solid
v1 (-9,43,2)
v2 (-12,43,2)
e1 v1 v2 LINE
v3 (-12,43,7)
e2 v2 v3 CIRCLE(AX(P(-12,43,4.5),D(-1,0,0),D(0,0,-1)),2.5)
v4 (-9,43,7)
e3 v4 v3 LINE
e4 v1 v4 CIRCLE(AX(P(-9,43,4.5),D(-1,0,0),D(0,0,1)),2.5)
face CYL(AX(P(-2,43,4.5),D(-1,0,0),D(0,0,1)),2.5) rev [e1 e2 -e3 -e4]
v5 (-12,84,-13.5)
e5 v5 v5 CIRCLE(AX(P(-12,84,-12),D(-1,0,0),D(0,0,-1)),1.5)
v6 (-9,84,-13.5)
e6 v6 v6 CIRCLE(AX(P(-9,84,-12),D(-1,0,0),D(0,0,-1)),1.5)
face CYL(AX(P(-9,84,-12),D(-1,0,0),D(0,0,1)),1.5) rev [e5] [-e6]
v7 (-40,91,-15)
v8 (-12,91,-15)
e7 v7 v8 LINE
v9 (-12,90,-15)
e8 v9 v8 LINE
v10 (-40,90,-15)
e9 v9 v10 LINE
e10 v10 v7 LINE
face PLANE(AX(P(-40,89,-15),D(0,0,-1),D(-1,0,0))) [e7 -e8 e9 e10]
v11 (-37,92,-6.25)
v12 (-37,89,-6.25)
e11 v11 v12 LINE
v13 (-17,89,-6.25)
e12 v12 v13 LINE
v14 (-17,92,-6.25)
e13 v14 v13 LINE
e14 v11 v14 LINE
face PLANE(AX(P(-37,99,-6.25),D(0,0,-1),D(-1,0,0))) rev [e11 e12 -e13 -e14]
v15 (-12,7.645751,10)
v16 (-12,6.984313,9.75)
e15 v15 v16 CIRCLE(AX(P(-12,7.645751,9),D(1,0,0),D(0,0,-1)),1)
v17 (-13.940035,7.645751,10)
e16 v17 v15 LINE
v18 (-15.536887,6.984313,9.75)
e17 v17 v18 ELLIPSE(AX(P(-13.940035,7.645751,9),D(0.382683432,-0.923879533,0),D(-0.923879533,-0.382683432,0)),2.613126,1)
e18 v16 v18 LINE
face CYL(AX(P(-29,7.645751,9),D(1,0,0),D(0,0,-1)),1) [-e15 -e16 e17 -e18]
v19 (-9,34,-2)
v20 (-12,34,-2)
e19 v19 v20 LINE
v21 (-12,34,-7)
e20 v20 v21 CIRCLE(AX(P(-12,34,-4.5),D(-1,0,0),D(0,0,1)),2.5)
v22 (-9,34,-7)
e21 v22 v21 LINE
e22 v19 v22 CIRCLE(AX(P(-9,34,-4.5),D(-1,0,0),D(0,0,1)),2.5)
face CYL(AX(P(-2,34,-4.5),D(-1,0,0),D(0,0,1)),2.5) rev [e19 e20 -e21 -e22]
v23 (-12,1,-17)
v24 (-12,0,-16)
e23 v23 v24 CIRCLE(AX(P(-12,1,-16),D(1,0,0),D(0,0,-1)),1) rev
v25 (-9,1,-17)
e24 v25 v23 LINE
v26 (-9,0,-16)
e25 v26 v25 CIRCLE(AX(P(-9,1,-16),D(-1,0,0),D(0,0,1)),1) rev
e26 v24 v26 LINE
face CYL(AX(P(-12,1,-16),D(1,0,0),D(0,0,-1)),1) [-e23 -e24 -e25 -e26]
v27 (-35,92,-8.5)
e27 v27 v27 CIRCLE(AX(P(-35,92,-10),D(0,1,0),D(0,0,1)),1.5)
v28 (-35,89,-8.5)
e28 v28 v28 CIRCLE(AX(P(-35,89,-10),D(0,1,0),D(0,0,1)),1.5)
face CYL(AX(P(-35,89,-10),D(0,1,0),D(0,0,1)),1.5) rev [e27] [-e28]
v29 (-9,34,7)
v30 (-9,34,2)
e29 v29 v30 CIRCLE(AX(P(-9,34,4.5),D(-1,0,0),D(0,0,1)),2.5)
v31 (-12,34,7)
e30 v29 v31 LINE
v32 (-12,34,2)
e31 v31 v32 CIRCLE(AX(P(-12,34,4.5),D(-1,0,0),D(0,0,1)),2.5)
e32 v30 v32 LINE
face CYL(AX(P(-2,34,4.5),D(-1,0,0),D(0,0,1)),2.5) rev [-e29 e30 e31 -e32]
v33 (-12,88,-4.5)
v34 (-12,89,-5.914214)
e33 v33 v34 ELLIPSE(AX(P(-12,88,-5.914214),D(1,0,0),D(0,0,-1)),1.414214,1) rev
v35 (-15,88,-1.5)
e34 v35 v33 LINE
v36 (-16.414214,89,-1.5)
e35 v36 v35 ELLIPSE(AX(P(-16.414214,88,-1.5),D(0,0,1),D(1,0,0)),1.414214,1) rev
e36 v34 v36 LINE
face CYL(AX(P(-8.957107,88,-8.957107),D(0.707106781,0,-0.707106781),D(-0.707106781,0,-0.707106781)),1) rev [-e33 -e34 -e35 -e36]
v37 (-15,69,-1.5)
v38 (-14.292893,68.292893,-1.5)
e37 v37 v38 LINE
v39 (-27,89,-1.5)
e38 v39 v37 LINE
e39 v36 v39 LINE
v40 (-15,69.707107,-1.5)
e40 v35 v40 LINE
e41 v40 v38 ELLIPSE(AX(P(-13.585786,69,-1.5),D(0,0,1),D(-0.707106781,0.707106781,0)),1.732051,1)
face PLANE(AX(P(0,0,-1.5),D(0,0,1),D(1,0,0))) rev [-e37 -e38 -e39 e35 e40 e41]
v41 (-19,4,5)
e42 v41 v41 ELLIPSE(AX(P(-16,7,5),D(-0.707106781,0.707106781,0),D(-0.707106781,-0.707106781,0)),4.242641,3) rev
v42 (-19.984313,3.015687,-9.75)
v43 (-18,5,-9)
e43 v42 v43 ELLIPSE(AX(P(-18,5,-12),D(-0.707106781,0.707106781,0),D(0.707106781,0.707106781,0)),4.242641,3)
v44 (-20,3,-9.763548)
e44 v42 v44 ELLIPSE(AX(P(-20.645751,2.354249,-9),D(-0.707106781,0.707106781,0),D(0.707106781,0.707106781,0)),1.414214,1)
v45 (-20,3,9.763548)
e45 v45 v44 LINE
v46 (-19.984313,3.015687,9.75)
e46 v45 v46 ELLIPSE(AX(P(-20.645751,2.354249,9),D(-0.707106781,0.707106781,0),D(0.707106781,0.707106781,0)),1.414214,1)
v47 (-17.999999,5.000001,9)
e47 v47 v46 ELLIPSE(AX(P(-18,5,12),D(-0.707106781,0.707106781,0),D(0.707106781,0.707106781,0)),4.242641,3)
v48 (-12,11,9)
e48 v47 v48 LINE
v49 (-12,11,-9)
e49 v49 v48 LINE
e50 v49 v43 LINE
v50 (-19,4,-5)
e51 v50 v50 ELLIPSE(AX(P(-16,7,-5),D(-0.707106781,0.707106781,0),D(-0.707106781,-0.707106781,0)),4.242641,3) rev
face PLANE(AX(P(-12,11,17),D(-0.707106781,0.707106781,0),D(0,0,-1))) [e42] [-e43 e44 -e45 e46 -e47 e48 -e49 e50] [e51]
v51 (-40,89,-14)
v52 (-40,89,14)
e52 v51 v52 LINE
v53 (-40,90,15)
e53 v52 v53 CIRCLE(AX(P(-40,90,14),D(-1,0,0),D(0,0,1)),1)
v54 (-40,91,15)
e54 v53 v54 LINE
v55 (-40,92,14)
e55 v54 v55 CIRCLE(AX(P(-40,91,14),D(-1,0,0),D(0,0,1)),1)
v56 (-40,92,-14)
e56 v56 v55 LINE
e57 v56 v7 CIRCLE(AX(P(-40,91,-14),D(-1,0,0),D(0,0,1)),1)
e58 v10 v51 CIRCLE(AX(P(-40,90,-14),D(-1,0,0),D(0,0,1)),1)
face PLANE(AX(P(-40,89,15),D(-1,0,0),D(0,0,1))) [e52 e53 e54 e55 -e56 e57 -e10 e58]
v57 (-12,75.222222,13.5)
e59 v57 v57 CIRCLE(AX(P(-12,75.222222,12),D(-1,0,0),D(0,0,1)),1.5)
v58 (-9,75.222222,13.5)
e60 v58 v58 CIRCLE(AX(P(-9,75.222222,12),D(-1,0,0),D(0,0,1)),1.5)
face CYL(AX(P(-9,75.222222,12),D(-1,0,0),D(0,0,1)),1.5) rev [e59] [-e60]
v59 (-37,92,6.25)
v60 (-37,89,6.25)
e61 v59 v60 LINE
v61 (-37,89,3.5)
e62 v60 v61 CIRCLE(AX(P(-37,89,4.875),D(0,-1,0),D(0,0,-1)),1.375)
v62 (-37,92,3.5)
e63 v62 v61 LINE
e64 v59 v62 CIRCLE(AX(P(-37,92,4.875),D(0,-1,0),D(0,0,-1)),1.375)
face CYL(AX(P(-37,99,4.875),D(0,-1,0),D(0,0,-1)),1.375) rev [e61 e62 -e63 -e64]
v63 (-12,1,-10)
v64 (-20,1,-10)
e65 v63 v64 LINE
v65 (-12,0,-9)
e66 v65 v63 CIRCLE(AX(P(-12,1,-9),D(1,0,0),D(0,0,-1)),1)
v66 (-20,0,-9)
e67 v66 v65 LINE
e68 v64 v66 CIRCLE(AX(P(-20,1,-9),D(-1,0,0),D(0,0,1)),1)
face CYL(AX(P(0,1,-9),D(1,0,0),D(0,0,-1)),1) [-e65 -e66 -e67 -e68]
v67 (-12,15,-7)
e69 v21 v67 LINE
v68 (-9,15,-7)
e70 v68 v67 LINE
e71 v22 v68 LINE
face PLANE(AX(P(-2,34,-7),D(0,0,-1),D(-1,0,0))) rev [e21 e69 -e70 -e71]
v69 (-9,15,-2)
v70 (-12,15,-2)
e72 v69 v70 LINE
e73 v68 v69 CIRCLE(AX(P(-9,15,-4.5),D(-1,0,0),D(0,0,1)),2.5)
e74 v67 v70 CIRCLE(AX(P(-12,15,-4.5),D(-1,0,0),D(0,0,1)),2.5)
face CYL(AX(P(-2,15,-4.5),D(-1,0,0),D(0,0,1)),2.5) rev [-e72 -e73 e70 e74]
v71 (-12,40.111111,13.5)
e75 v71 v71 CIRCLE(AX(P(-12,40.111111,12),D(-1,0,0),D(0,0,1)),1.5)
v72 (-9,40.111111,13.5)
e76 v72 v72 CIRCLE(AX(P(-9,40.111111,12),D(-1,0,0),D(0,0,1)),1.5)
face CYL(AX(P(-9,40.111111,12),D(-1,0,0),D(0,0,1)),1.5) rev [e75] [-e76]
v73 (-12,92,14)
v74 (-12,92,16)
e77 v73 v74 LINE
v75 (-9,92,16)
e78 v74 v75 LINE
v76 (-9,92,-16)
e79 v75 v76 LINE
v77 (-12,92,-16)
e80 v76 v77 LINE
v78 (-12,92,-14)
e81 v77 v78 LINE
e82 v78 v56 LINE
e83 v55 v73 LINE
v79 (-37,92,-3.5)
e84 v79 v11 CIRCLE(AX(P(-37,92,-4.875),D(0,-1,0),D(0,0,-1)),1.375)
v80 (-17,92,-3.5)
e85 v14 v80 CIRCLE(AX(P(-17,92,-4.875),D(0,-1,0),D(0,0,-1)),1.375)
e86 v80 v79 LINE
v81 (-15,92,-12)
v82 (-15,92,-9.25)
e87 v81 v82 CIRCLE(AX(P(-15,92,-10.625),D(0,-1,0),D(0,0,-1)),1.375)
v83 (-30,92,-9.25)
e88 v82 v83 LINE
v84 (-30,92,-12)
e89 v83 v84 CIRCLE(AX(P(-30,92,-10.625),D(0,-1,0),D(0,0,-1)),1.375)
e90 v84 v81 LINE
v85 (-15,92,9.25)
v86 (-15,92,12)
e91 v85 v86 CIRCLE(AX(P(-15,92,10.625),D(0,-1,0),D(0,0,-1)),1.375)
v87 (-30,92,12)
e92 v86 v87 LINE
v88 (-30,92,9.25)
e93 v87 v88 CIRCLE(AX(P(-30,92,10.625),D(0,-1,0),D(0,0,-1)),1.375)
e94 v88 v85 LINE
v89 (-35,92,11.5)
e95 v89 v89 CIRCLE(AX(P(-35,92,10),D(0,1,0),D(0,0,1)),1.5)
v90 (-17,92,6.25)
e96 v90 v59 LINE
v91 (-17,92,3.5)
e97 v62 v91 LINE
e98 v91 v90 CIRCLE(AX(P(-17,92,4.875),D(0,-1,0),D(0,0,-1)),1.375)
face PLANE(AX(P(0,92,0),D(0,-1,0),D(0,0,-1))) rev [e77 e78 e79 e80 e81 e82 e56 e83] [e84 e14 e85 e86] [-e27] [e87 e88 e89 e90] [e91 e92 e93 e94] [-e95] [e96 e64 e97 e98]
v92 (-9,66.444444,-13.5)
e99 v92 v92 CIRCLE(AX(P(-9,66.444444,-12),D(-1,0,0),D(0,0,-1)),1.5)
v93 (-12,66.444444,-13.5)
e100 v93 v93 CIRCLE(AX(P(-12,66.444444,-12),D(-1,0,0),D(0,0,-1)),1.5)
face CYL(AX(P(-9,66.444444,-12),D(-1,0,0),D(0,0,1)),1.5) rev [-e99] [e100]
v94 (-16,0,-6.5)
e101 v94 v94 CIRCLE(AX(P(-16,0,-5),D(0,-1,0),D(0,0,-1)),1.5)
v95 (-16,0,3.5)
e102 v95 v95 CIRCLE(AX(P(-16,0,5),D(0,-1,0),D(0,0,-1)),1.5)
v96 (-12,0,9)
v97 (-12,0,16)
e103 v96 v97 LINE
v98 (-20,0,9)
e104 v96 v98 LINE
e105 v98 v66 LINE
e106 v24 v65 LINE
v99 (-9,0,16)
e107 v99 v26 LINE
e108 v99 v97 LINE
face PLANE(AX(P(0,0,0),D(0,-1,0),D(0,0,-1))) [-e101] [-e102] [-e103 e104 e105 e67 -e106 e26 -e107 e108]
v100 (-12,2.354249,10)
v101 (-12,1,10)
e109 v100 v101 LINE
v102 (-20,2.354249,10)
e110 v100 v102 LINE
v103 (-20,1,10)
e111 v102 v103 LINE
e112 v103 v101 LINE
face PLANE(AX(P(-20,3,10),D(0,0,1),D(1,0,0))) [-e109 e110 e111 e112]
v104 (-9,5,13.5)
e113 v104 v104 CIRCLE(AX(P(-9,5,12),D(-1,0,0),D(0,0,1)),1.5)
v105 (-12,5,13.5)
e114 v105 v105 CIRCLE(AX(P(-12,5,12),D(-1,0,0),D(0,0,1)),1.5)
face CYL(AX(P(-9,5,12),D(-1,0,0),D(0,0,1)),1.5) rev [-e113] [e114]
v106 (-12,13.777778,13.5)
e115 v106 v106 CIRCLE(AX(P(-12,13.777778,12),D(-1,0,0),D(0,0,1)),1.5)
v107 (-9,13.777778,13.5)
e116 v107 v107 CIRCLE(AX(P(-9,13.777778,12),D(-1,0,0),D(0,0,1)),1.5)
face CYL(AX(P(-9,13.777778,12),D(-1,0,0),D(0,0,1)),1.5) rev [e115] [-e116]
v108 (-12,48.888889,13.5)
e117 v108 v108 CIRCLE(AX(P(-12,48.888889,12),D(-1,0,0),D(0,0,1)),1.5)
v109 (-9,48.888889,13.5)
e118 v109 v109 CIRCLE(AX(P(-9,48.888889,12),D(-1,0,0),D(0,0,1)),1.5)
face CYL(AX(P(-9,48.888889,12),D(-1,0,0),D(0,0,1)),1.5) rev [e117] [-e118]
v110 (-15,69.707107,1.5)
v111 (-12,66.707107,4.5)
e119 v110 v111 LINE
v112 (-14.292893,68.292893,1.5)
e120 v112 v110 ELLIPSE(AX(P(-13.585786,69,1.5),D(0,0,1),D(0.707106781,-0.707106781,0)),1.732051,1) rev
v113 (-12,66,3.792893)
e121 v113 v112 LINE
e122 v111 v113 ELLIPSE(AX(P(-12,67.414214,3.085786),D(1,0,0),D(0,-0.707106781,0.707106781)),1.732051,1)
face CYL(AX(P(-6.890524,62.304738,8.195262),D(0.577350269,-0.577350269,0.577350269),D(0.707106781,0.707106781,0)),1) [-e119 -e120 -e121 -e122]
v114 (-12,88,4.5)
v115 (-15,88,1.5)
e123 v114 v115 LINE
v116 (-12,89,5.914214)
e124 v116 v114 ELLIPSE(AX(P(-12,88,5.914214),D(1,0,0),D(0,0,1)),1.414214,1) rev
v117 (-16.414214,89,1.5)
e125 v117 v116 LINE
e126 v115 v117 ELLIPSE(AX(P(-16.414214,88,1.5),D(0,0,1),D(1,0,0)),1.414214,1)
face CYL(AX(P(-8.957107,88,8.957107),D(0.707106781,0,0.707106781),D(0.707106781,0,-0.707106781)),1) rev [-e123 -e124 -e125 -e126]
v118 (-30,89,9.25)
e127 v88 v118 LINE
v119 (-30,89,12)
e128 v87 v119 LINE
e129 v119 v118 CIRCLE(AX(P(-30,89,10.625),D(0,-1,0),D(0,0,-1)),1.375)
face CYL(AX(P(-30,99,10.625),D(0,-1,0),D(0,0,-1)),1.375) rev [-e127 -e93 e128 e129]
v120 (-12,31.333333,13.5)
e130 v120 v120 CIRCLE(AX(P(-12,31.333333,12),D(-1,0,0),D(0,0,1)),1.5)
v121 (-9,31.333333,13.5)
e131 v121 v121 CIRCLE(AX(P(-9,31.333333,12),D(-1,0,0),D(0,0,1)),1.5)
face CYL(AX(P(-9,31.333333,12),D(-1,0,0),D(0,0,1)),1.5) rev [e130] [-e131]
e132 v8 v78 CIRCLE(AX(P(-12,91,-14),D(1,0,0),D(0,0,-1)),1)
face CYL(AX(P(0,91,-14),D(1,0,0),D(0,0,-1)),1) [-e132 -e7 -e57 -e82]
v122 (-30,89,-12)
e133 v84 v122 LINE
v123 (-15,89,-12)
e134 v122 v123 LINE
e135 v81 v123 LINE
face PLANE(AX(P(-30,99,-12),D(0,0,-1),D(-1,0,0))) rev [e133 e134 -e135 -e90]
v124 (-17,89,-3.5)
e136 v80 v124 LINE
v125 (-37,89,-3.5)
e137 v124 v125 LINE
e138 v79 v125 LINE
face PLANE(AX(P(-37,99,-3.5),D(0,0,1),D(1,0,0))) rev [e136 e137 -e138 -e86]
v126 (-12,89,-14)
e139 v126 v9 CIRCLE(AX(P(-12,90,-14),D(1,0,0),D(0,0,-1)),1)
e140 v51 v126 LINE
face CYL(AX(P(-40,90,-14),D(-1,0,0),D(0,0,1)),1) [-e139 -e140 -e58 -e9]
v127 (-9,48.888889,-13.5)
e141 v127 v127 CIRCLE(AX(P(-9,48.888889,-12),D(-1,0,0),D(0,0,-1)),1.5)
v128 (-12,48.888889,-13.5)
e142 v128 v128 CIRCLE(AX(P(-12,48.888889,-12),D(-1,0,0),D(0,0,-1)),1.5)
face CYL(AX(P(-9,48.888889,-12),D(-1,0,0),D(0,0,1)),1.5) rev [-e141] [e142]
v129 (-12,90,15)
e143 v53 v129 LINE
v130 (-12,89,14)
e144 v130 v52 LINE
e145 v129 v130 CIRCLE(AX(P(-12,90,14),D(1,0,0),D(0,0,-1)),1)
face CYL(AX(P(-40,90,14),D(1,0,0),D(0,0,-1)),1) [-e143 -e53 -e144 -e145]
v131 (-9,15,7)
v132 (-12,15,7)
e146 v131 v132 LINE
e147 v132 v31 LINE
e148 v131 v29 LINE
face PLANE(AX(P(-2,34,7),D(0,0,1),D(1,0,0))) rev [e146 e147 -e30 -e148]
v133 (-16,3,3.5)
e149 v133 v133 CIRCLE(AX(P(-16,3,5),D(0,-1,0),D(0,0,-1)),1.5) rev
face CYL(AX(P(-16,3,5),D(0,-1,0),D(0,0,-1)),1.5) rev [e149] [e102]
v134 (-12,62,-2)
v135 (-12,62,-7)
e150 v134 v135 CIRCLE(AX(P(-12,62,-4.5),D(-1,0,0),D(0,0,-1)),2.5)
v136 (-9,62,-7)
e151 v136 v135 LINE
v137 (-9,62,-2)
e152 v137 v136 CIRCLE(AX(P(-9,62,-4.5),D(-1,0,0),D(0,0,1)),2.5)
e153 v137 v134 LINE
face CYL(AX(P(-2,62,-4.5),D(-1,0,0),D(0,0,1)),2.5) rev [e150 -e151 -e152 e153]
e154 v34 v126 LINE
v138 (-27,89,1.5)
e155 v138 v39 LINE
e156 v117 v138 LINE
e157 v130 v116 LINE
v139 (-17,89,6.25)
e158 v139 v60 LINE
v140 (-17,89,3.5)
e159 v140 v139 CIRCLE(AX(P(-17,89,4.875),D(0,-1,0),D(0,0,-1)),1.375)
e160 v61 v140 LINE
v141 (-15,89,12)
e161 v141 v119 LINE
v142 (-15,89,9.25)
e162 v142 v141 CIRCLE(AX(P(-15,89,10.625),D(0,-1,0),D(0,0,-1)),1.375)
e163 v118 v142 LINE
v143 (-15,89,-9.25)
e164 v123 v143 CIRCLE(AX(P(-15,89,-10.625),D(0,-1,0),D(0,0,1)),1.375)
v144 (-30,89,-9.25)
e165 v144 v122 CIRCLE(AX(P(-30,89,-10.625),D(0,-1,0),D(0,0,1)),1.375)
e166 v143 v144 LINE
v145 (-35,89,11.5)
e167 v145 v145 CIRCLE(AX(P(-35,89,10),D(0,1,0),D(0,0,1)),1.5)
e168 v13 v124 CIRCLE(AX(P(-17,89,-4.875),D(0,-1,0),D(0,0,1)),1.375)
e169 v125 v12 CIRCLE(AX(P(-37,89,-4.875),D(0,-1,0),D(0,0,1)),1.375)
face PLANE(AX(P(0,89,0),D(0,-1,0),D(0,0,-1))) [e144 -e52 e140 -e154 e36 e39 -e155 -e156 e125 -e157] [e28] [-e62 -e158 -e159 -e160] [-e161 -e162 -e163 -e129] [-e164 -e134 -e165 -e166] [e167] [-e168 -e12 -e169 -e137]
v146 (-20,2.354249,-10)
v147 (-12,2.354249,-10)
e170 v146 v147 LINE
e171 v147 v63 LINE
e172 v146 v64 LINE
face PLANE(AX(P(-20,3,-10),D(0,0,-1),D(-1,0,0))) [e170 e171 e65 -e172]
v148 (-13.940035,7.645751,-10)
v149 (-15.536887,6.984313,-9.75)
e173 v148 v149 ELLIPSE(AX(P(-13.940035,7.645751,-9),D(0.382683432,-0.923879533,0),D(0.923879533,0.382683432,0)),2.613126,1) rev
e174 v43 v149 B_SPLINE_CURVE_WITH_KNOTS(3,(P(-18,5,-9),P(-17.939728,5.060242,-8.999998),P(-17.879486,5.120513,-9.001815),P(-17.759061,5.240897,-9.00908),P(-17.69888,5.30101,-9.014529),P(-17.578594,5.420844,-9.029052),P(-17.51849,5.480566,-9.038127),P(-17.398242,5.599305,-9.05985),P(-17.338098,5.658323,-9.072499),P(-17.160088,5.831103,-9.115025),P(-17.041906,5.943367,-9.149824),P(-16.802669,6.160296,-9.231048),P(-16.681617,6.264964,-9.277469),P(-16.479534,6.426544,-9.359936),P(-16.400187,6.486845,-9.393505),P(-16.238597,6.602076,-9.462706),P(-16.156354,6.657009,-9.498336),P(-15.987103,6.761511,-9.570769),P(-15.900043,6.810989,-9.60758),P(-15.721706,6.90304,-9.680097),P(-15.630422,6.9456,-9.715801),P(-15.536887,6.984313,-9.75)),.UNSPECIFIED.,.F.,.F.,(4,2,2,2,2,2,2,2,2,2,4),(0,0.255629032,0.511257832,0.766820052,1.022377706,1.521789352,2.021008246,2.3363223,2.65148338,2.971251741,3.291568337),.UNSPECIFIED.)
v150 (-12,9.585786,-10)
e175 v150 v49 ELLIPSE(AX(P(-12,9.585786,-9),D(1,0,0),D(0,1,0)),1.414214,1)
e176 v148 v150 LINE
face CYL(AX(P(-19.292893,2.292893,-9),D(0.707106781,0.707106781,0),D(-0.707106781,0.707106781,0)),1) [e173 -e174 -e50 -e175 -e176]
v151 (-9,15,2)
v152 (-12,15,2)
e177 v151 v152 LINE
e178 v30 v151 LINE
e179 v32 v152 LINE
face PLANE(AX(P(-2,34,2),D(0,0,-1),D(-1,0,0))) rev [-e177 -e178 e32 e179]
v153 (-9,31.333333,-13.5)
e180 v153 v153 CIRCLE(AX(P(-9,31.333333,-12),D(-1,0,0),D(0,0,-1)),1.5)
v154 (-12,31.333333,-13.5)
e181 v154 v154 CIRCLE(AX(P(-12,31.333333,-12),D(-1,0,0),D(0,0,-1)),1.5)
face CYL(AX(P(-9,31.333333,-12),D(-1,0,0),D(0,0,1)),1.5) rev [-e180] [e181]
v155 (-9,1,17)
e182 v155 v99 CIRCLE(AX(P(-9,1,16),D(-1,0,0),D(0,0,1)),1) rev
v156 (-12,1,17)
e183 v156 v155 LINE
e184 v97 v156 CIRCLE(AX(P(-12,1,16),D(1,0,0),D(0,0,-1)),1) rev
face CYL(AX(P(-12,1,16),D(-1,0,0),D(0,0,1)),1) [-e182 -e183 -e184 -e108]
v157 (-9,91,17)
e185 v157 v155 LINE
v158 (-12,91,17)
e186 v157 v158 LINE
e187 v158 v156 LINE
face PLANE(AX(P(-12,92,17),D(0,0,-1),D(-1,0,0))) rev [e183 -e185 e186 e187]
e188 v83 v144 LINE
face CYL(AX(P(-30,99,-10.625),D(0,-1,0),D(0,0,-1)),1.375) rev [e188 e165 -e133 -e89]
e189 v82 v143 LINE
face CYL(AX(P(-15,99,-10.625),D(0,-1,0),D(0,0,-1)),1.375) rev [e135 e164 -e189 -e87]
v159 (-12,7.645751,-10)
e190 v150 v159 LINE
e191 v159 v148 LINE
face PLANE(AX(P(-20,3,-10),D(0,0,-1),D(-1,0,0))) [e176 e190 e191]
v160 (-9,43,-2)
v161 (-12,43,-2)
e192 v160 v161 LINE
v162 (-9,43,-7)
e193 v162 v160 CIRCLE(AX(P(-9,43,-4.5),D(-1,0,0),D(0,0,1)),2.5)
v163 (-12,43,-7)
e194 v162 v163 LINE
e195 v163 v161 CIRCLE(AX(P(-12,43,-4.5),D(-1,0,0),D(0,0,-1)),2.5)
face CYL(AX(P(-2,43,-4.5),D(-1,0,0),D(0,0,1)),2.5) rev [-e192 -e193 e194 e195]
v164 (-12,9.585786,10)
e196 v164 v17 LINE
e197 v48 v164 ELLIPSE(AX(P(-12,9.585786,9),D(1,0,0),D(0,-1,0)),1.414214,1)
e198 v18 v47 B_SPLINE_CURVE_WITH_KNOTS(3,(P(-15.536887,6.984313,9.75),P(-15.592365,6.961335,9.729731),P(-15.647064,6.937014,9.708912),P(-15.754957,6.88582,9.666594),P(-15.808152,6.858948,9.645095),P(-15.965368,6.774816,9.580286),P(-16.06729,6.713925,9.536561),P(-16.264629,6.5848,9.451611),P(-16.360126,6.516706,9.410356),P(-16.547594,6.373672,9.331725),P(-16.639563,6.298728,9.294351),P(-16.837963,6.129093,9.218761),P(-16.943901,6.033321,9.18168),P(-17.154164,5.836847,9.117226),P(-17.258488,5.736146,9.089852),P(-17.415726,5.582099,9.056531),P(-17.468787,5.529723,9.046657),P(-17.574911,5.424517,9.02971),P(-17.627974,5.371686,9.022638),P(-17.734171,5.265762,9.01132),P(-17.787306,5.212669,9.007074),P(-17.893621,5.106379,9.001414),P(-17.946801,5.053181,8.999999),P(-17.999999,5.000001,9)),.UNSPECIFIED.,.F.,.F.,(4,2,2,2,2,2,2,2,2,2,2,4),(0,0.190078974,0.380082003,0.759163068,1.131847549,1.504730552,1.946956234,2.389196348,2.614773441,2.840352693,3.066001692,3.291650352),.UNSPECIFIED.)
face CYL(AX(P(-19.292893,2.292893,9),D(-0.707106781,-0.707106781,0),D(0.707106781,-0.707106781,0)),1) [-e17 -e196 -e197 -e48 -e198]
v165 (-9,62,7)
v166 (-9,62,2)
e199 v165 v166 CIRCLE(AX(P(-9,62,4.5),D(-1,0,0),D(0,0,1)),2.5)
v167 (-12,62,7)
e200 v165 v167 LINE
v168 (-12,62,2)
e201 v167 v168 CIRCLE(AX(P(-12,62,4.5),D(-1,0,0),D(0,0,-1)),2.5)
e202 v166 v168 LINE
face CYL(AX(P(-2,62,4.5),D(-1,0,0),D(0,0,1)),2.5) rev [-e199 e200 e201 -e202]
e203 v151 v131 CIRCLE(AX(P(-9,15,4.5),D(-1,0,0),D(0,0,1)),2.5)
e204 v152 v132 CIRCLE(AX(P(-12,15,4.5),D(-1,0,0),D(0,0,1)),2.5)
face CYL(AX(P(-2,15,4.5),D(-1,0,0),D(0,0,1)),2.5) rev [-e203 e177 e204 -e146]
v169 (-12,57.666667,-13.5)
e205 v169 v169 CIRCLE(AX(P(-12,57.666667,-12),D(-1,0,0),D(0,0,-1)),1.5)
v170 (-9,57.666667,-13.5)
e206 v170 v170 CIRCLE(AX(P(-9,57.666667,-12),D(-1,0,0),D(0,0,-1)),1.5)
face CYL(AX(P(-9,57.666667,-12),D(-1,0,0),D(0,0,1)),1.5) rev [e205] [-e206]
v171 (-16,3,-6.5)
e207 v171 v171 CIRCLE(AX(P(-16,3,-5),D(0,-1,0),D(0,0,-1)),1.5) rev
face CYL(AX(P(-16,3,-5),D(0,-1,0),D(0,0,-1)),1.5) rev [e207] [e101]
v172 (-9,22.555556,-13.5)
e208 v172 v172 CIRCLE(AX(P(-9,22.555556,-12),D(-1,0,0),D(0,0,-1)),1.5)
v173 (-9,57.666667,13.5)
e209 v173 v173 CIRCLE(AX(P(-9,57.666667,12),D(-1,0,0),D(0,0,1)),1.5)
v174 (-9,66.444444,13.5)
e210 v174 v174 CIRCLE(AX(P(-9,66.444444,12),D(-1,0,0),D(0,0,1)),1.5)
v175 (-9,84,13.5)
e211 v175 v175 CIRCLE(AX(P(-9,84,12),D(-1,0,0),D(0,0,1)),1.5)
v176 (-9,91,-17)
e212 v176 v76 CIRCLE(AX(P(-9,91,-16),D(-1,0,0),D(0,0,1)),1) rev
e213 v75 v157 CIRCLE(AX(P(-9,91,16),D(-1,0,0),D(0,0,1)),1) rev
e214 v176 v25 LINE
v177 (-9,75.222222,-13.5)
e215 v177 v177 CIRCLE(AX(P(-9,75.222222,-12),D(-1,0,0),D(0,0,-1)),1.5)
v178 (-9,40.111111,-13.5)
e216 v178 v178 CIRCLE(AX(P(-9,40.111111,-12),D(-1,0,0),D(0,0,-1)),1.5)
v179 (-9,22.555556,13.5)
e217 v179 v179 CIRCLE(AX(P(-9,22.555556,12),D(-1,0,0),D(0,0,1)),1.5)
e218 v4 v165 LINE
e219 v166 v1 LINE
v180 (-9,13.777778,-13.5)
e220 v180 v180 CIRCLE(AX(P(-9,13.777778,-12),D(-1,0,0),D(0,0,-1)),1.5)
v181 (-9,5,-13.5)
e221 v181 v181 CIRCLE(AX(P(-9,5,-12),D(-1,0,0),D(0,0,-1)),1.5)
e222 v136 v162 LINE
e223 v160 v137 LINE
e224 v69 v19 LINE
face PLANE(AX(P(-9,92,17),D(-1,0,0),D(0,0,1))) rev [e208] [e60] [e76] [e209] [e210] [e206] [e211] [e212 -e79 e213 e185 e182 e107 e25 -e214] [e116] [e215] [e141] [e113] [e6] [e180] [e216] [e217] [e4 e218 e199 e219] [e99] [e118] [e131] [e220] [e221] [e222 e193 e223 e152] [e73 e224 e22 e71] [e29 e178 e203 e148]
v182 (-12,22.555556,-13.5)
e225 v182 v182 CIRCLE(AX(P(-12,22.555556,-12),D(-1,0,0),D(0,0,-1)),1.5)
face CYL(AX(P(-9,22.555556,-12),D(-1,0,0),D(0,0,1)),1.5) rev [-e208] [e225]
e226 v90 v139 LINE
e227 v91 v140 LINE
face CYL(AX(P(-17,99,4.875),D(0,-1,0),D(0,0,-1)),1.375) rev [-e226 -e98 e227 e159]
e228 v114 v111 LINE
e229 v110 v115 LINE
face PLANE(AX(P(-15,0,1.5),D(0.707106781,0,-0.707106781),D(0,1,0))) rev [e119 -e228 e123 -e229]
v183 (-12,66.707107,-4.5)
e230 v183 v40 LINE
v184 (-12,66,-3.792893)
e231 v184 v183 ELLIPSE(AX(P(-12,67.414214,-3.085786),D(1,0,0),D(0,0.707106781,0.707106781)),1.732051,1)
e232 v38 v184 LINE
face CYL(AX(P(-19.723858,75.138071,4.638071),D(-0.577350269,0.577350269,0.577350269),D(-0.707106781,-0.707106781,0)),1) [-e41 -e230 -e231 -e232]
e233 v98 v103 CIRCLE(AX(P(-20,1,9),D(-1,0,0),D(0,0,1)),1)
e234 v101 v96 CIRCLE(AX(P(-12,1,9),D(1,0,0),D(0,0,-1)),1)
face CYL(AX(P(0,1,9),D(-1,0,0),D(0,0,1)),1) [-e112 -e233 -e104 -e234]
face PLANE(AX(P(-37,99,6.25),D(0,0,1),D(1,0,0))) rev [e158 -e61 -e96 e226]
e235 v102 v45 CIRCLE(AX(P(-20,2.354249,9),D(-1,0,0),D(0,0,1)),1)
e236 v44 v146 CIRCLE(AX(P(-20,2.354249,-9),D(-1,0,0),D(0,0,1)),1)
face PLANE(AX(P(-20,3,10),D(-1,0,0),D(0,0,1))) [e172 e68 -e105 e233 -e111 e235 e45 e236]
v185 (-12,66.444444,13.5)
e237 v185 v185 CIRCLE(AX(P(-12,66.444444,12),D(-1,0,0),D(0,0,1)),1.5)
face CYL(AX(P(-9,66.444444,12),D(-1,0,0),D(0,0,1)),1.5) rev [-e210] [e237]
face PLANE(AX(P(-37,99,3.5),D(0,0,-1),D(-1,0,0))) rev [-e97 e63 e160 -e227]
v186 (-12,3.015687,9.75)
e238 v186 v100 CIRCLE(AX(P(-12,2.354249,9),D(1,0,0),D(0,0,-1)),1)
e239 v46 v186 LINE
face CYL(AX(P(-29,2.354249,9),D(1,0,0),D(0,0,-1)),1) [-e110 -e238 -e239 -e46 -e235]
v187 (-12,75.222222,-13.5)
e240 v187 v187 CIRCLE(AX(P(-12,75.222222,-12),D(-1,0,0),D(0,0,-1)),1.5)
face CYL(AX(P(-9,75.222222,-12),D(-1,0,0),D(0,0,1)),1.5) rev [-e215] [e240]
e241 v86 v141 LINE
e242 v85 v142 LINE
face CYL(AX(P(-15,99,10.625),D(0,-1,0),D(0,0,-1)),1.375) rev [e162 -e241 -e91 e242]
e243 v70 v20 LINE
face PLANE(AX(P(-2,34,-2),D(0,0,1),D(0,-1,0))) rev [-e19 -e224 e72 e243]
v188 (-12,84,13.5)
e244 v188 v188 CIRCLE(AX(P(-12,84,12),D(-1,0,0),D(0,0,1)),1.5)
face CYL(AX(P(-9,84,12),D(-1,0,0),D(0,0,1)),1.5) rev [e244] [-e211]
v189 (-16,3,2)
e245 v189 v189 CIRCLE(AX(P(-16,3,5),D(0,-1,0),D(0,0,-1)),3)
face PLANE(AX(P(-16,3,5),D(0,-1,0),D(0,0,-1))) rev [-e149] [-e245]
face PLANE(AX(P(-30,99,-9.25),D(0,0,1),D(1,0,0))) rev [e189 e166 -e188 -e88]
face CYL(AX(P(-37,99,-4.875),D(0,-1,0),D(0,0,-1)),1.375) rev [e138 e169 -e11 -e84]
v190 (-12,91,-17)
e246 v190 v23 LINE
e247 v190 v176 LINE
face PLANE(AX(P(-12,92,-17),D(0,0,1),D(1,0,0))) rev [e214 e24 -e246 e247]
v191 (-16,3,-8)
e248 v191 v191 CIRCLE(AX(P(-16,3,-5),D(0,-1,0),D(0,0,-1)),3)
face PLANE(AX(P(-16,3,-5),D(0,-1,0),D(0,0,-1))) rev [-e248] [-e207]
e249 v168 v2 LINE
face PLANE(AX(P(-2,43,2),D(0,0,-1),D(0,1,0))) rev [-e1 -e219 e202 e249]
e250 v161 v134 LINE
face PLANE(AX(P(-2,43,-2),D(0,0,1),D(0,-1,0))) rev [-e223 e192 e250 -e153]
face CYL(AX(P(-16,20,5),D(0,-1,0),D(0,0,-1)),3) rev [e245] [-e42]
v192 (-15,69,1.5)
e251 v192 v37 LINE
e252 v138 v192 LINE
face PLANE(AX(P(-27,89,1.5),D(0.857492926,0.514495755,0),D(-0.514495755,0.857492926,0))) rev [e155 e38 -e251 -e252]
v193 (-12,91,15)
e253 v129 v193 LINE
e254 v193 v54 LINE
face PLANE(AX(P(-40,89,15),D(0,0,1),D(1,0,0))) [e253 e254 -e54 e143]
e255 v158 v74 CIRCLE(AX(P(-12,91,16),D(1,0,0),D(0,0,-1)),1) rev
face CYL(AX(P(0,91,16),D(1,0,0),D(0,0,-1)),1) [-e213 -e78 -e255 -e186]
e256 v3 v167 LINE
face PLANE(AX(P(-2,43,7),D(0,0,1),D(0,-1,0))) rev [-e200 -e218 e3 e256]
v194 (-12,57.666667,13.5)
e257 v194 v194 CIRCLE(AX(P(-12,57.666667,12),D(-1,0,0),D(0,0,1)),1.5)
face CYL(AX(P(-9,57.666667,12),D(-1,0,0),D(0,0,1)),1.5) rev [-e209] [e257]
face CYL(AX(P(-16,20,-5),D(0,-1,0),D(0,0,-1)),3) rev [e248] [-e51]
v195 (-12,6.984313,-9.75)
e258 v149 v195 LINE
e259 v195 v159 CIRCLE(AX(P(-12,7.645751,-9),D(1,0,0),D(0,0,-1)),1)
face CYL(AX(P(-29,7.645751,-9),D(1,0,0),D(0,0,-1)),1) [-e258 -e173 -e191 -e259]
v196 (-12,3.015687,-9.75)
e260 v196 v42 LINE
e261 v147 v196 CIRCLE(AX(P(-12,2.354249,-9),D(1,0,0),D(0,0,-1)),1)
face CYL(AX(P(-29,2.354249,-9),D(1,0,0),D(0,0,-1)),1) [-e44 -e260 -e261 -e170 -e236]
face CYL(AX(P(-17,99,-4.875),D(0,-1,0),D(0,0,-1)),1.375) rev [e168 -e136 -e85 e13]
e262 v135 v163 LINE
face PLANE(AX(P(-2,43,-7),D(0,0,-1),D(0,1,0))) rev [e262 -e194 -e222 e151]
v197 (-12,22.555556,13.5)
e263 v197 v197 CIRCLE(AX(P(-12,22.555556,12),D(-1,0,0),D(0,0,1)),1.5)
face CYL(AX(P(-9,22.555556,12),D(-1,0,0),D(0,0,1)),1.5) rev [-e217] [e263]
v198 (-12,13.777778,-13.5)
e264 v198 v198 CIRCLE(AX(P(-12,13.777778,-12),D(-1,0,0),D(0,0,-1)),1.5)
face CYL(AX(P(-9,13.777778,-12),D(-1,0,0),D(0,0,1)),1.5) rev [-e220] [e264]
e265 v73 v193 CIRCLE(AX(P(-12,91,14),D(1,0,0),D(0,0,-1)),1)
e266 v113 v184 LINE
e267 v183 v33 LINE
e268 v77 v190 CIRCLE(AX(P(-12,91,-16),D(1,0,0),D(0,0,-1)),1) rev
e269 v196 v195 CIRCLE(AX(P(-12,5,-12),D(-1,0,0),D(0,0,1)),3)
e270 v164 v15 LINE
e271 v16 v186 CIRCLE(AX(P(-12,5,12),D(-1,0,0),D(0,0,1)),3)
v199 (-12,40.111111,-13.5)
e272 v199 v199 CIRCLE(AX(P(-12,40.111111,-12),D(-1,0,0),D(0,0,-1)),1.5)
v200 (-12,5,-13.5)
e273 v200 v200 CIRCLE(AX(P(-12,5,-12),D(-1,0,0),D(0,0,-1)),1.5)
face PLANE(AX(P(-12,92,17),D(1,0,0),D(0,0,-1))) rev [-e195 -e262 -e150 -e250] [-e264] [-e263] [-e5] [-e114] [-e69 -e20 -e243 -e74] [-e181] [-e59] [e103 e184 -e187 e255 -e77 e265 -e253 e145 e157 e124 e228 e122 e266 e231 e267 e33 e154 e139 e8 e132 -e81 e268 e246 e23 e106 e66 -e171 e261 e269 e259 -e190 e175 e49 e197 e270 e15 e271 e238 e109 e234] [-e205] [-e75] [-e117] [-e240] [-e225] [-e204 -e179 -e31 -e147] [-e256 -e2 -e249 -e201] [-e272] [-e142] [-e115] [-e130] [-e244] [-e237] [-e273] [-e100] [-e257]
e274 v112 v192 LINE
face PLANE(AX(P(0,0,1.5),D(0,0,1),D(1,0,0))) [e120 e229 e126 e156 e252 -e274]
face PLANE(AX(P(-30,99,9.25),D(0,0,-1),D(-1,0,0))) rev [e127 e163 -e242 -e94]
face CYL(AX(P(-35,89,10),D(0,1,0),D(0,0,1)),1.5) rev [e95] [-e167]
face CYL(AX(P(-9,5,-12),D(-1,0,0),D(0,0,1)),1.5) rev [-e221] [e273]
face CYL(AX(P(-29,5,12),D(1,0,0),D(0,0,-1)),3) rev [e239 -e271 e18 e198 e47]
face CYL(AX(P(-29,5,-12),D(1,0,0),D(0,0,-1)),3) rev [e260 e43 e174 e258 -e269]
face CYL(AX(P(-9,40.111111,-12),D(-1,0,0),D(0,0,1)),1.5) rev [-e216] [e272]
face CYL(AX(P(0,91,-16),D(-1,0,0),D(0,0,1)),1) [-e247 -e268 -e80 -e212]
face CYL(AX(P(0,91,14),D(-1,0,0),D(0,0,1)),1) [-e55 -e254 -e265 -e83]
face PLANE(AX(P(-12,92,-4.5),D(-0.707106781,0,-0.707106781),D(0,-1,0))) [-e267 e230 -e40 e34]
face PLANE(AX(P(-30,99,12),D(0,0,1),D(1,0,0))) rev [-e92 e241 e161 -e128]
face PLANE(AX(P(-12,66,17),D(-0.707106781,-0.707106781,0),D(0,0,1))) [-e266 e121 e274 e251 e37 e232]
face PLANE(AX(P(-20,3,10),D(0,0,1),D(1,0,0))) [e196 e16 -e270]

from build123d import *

# Parameters (mm, degrees)
SKETCH_1_W          = 3
SKETCH_1_H          = 34
EXTRUDE_1_DEPTH     = 92
SKETCH_2_W          = 8
SKETCH_2_H          = 20
SKETCH_2_R          = 1.5
EXTRUDE_2_DEPTH     = 3
SKETCH_10_W         = 28
SKETCH_10_H         = 30
SKETCH_10_R         = 1.5
EXTRUDE_6_DEPTH     = 3
EXTRUDE_7_DEPTH     = 1.5
CHAMFER_3_SIZE      = 3
SKETCH_9_R          = 1.5
CUT_EXTRUDE_2_DEPTH = 3
CHAMFER_4_SIZE      = 8
SKETCH_12_R         = 3
CUT_EXTRUDE_3_DEPTH = 17
CUT_EXTRUDE_START   = -3
SKETCH_13_R         = 3
CUT_EXTRUDE_4_DEPTH = 17
FILLET_1_R          = 1
CUT_EXTRUDE_5_DEPTH = 10
CUT_EXTRUDE_6_DEPTH = 10


# Some blends are built 0.0001 mm under size
with BuildPart() as part:
    # 草图1 → 凸台-拉伸1 (new body)
    with BuildSketch(Plane(origin=(0, 0, 0), x_dir=(1, 0, 0), z_dir=(0, 1, 0))):
        with Locations((-10.5, 0)):
            Rectangle(SKETCH_1_W, SKETCH_1_H)
    extrude(amount=EXTRUDE_1_DEPTH)

    # 草图2 → 凸台-拉伸2 (add)
    with BuildSketch(Plane.XZ):
        with Locations((-16, 0)):
            Rectangle(SKETCH_2_W, SKETCH_2_H)
        with Locations(Location((-16, 5, 0), (0, 0, 270))):
            Circle(SKETCH_2_R, mode=Mode.SUBTRACT)
        with Locations(Location((-16, -5, 0), (0, 0, 270))):
            Circle(SKETCH_2_R, mode=Mode.SUBTRACT)
    extrude(amount=-EXTRUDE_2_DEPTH)

    # 草图10 → 凸台-拉伸6 (add)
    with BuildSketch(Plane(origin=(0, 92, 0), x_dir=(1, 0, 0), z_dir=(0, 1, 0))):
        with Locations((-26, 0)):
            Rectangle(SKETCH_10_W, SKETCH_10_H)
        with Locations(Location((-35, 10, 0), (0, 0, 270))):
            Circle(SKETCH_10_R, mode=Mode.SUBTRACT)
        with Locations(Location((-35, -10, 0), (0, 0, 270))):
            Circle(SKETCH_10_R, mode=Mode.SUBTRACT)
    extrude(amount=-EXTRUDE_6_DEPTH)

    # 草图11 → 凸台-拉伸7 (add, symmetric)
    with BuildSketch(Plane.XY):
        Polygon((-12, 69), (-12, 89), (-27, 89), (-15, 69), align=None)
    extrude(amount=EXTRUDE_7_DEPTH, both=True)

    # 倒角3
    chamfer_3_edges = [part.edges().sort_by_distance(p)[0] for p in [
        (-12, 79, -1.5),
        (-12, 69, 0),
        (-12, 79, 1.5),
    ]]
    chamfer(chamfer_3_edges, length=CHAMFER_3_SIZE - 0.0001)  # a hair under: the kernel refuses the full size

    # 草图9 → 切除-拉伸2 (cut)
    with BuildSketch(Plane.ZY.offset(12)):
        with Locations((12, 5)):
            Circle(SKETCH_9_R)
        with Locations((12, 13.777777778)):
            Circle(SKETCH_9_R)
        with Locations((12, 22.555555556)):
            Circle(SKETCH_9_R)
        with Locations((12, 31.333333333)):
            Circle(SKETCH_9_R)
        with Locations((12, 40.111111111)):
            Circle(SKETCH_9_R)
        with Locations((12, 48.888888889)):
            Circle(SKETCH_9_R)
        with Locations((12, 57.666666667)):
            Circle(SKETCH_9_R)
        with Locations((12, 66.444444444)):
            Circle(SKETCH_9_R)
        with Locations((12, 75.222222222)):
            Circle(SKETCH_9_R)
        with Locations((12, 84)):
            Circle(SKETCH_9_R)
        with Locations(Location((-12, 84, 0), (0, 0, 180))):
            Circle(SKETCH_9_R)
        with Locations(Location((-12, 75.222222222, 0), (0, 0, 180))):
            Circle(SKETCH_9_R)
        with Locations(Location((-12, 66.444444444, 0), (0, 0, 180))):
            Circle(SKETCH_9_R)
        with Locations(Location((-12, 57.666666667, 0), (0, 0, 180))):
            Circle(SKETCH_9_R)
        with Locations(Location((-12, 48.888888889, 0), (0, 0, 180))):
            Circle(SKETCH_9_R)
        with Locations(Location((-12, 40.111111111, 0), (0, 0, 180))):
            Circle(SKETCH_9_R)
        with Locations(Location((-12, 31.333333333, 0), (0, 0, 180))):
            Circle(SKETCH_9_R)
        with Locations(Location((-12, 22.555555556, 0), (0, 0, 180))):
            Circle(SKETCH_9_R)
        with Locations(Location((-12, 13.777777778, 0), (0, 0, 180))):
            Circle(SKETCH_9_R)
        with Locations(Location((-12, 5, 0), (0, 0, 180))):
            Circle(SKETCH_9_R)
    extrude(amount=-CUT_EXTRUDE_2_DEPTH, mode=Mode.SUBTRACT)

    # 倒角4
    # the kernel refuses this chamfer: 8 mm, written as the material it adds along each edge
    with BuildSketch(Plane(origin=(-12, 3, 10), x_dir=(0.027495876610586494, 0.9996219169112968, 0), z_dir=(0, 0, -1))) as chamfer_4_piece_1_section:
        Polygon((CHAMFER_4_SIZE * 0.999621916911, -CHAMFER_4_SIZE * 0.0274958766106), (-CHAMFER_4_SIZE * 0.0274958766106, -CHAMFER_4_SIZE * 0.999621916911), (0, 0), align=None)
    chamfer_4_piece_1 = extrude(amount=20, mode=Mode.PRIVATE)
    chamfer_4_piece_1 = split(chamfer_4_piece_1, bisect_by=Plane(origin=(-20, 5.703132101, -1.264e-06), z_dir=(1, 0, 0)), keep=Keep.TOP, mode=Mode.PRIVATE)
    chamfer_4_piece_1 = chamfer_4_piece_1 - Plane(origin=(-16, 5.703132101, 5), x_dir=(0, 0, -1), z_dir=(0, -1, 0)) * Cylinder(1.5, 72, mode=Mode.PRIVATE)
    chamfer_4_piece_1 = chamfer_4_piece_1 - Plane(origin=(-16, 5.703132101, -5), x_dir=(0, 0, -1), z_dir=(0, -1, 0)) * Cylinder(1.5, 72, mode=Mode.PRIVATE)
    add(chamfer_4_piece_1)

    # 草图12 → 切除-拉伸3 (cut)
    with BuildSketch(Plane.ZY.offset(12)):
        with Locations((-12, 5)):
            Circle(SKETCH_12_R)
        with Locations((12, 5)):
            Circle(SKETCH_12_R)
    extrude(amount=CUT_EXTRUDE_3_DEPTH, mode=Mode.SUBTRACT)

    # 草图13 → 切除-拉伸4 (cut)
    with BuildSketch(Plane.XZ.offset(CUT_EXTRUDE_START)):
        with Locations(Location((-16, 5, 0), (0, 0, 270))):
            Circle(SKETCH_13_R)
        with Locations(Location((-16, -5, 0), (0, 0, 270))):
            Circle(SKETCH_13_R)
    extrude(amount=-CUT_EXTRUDE_4_DEPTH, mode=Mode.SUBTRACT)

    # 圆角1
    # the kernel refuses this fillet: 1 mm, written as the material it adds along each edge
    with BuildSketch(Plane(origin=(-10.232233047, 89, -6.267666953), x_dir=(-0.7071067811865476, 0, -0.7071067811865476), z_dir=(-0.7071067811865476, 0, 0.7071067811865476)), Plane(origin=(-10.232233047, 89, 6.267666953), x_dir=(0, -1, 0), z_dir=(-0.7071067811865476, 0, -0.7071067811865476))) as fillet_1_piece_1:
        with BuildLine():
            CenterArc((FILLET_1_R, FILLET_1_R), FILLET_1_R, 180, 90)
            Line((0, FILLET_1_R), (0, 0))
            Line((0, 0), (FILLET_1_R, 0))
        make_face()
    extrude(amount=9.242499266)
    # the kernel refuses this fillet: 1 mm, written as the material it takes off along each edge
    with BuildSketch(Plane(origin=(-12, 0, -10), x_dir=(0, 0, 1), z_dir=(-1, 0, 0)), Plane(origin=(-22.5, 0, 10), x_dir=(0, 0, -1), z_dir=(1, 0, 0))) as fillet_1_2_piece_1:
        with BuildLine():
            CenterArc((FILLET_1_R, FILLET_1_R), FILLET_1_R, 180, 90)
            Line((0, FILLET_1_R), (0, 0))
            Line((0, 0), (FILLET_1_R, 0))
        make_face()
    extrude(amount=10.5, mode=Mode.SUBTRACT)
    with BuildSketch(Plane(origin=(-6.5, 0, -17), x_dir=(0, 1, 0), z_dir=(-1, 0, 0)), Plane(origin=(-6.5, 92, -17), x_dir=(0, 0, 1), z_dir=(-1, 0, 0)), Plane(origin=(-14.5, 92, 17), x_dir=(0, 0, -1), z_dir=(1, 0, 0))) as fillet_1_2_piece_2:
        with BuildLine():
            CenterArc((FILLET_1_R, -FILLET_1_R), FILLET_1_R, 90, 90)
            Line((0, -FILLET_1_R), (0, 0))
            Line((0, 0), (FILLET_1_R, 0))
        make_face()
    extrude(amount=8, mode=Mode.SUBTRACT)
    with BuildSketch(Plane(origin=(-12, 92, -15), x_dir=(0, -1, 0), z_dir=(-1, 0, 0)), Plane(origin=(-12, 89, -15), x_dir=(0, 0, 1), z_dir=(-1, 0, 0)), Plane(origin=(-42.5, 89, 15), x_dir=(0, 0, -1), z_dir=(1, 0, 0))) as fillet_1_2_piece_3:
        with BuildLine():
            CenterArc((FILLET_1_R, FILLET_1_R), FILLET_1_R, 180, 90)
            Line((0, FILLET_1_R), (0, 0))
            Line((0, 0), (FILLET_1_R, 0))
        make_face()
    extrude(amount=30.5, mode=Mode.SUBTRACT)
    with BuildSketch(Plane(origin=(-11.166666667, 65.166766667, -5.333233333), x_dir=(0.4082482904638647, -0.4082482904638616, 0.8164965809277258), z_dir=(-0.5773502691896261, 0.5773502691896254, 0.5773502691896261))) as fillet_1_2_piece_4_section:
        with BuildLine():
            CenterArc((FILLET_1_R * 0.57735026919, FILLET_1_R), FILLET_1_R, 210, 60)
            Line((-FILLET_1_R * 0.288675134595, FILLET_1_R * 0.5), (0, 0))
            Line((0, 0), (FILLET_1_R * 0.57735026919, 0))
        make_face()
    fillet_1_2_piece_4 = extrude(amount=8.082730564, mode=Mode.PRIVATE)
    fillet_1_2_piece_4 = split(fillet_1_2_piece_4, bisect_by=Plane(origin=(-12, 67.52905753, -2.97094247), z_dir=(-1, 0, 0)), keep=Keep.TOP, mode=Mode.PRIVATE)
    fillet_1_2_piece_4 = split(fillet_1_2_piece_4, bisect_by=Plane(origin=(-13.382960945, 67.52905753, -1.5), z_dir=(0, 0, -1)), keep=Keep.TOP, mode=Mode.PRIVATE)
    add(fillet_1_2_piece_4, mode=Mode.SUBTRACT)
    with BuildSketch(Plane(origin=(-11.166666667, 65.166766667, 5.333233333), x_dir=(0.40824829046386624, -0.4082482904638601, -0.8164965809277258), z_dir=(-0.5773502691896261, 0.5773502691896254, -0.5773502691896261))) as fillet_1_2_piece_5_section:
        with BuildLine():
            CenterArc((FILLET_1_R * 0.57735026919, -FILLET_1_R), FILLET_1_R, 90, 60)
            Line((-FILLET_1_R * 0.288675134595, -FILLET_1_R * 0.5), (0, 0))
            Line((0, 0), (FILLET_1_R * 0.57735026919, 0))
        make_face()
    fillet_1_2_piece_5 = extrude(amount=8.082730564, mode=Mode.PRIVATE)
    fillet_1_2_piece_5 = split(fillet_1_2_piece_5, bisect_by=Plane(origin=(-12, 67.52905753, 2.97094247), z_dir=(-1, 0, 0)), keep=Keep.TOP, mode=Mode.PRIVATE)
    fillet_1_2_piece_5 = split(fillet_1_2_piece_5, bisect_by=Plane(origin=(-13.382960945, 67.52905753, 1.5), z_dir=(0, 0, 1)), keep=Keep.TOP, mode=Mode.PRIVATE)
    add(fillet_1_2_piece_5, mode=Mode.SUBTRACT)
    with BuildSketch(Plane(origin=(-42.5, 92, 15), x_dir=(0, 0, -1), z_dir=(1, 0, 0))) as fillet_1_2_piece_6:
        with BuildLine():
            CenterArc((FILLET_1_R, -FILLET_1_R), FILLET_1_R, 90, 90)
            Line((0, -FILLET_1_R), (0, 0))
            Line((0, 0), (FILLET_1_R, 0))
        make_face()
    extrude(amount=30.5, mode=Mode.SUBTRACT)
    with BuildSketch(Plane(origin=(-21.024208334, 2.763932023, 10), x_dir=(0, 0.7095749965325545, -0.7046299200969438), z_dir=(1, 0, 0))) as fillet_1_2_piece_7:
        with BuildLine():
            CenterArc((0.41392887, -0.998250131), FILLET_1_R, 93.390031497, 41.409622109)
            Line((-0.29070105, -0.288675135), (0, 0))
            ThreePointArc((0, 0), (0.177398087, -0.005249607), (0.354796174, 0))
        make_face()
    extrude(amount=9.024208334, mode=Mode.SUBTRACT)
    with BuildSketch(Plane(origin=(-16.788140356, 7.236067977, 10), x_dir=(0, 1, 0), z_dir=(1, 0, 0))) as fillet_1_2_piece_8:
        with BuildLine():
            CenterArc((0.409683334, -1), FILLET_1_R, 90, 41.409622109)
            ThreePointArc((-0.251754494, -0.25), (-0.122178217, -0.12872499), (0, 0))
            Line((0, 0), (0.409683334, 0))
        make_face()
    extrude(amount=4.788140356, mode=Mode.SUBTRACT)
    with BuildSketch(Plane(origin=(-10.232233047, 12.767766953, 10), x_dir=(0, 0, -1), z_dir=(-0.7071067811868302, -0.7071067811862649, 0))) as fillet_1_2_piece_9_section:
        with BuildLine():
            CenterArc((FILLET_1_R, FILLET_1_R), FILLET_1_R, 180, 90)
            Line((0, FILLET_1_R), (0, 0))
            Line((0, 0), (FILLET_1_R, 0))
        make_face()
    fillet_1_2_piece_9 = extrude(amount=10.323003714, mode=Mode.PRIVATE)
    fillet_1_2_piece_9 = split(fillet_1_2_piece_9, bisect_by=Plane(origin=(-12, 8.839090903, 9.756601608), z_dir=(-1, 0, 0)), keep=Keep.TOP, mode=Mode.PRIVATE)
    add(fillet_1_2_piece_9, mode=Mode.SUBTRACT)
    with BuildSketch(Plane(origin=(-10.232233047, 12.767766953, -10), x_dir=(0, 0, 1), z_dir=(-0.7071067811868302, -0.7071067811862649, 0))) as fillet_1_2_piece_10_section:
        with BuildLine():
            CenterArc((FILLET_1_R, -FILLET_1_R), FILLET_1_R, 90, 90)
            Line((0, -FILLET_1_R), (0, 0))
            Line((0, 0), (FILLET_1_R, 0))
        make_face()
    fillet_1_2_piece_10 = extrude(amount=10.323003714, mode=Mode.PRIVATE)
    fillet_1_2_piece_10 = split(fillet_1_2_piece_10, bisect_by=Plane(origin=(-12, 8.839097768, -9.756602102), z_dir=(-1, 0, 0)), keep=Keep.TOP, mode=Mode.PRIVATE)
    add(fillet_1_2_piece_10, mode=Mode.SUBTRACT)
    with BuildSketch(Plane(origin=(-16.788140356, 7.236067977, -10), x_dir=(0, 1, 0), z_dir=(1, 0, 0))) as fillet_1_2_piece_11:
        with BuildLine():
            CenterArc((0.409683334, 1), FILLET_1_R, 228.590377891, 41.409622109)
            ThreePointArc((-0.251754494, 0.25), (-0.122178217, 0.12872499), (0, 0))
            Line((0, 0), (0.409683334, 0))
        make_face()
    extrude(amount=4.788140356, mode=Mode.SUBTRACT)
    with BuildSketch(Plane(origin=(-21.024208334, 2.763932023, -10), x_dir=(0, 0.7095749965325564, 0.7046299200969418), z_dir=(1, 0, 0))) as fillet_1_2_piece_12:
        with BuildLine():
            CenterArc((0.41392887, 0.998250131), FILLET_1_R, 225.200346393, 41.409622109)
            Line((-0.29070105, 0.288675135), (0, 0))
            ThreePointArc((0, 0), (0.177398087, 0.005249607), (0.354796174, 0))
        make_face()
    extrude(amount=9.024208334, mode=Mode.SUBTRACT)
    with BuildSketch(Plane(origin=(-14.5, 0, 17), x_dir=(0, 0, -1), z_dir=(1, 0, 0))) as fillet_1_2_piece_13:
        with BuildLine():
            CenterArc((FILLET_1_R, FILLET_1_R), FILLET_1_R, 180, 90)
            Line((0, FILLET_1_R), (0, 0))
            Line((0, 0), (FILLET_1_R, 0))
        make_face()
    extrude(amount=8, mode=Mode.SUBTRACT)

    # 草图14 → 切除-拉伸5 (cut)
    with BuildSketch(Plane.ZY.offset(12)):
        with BuildLine():
            Line((-2, 34), (-2, 15))
            ThreePointArc((-2, 15), (-4.5, 12.5), (-7, 15))
            Line((-7, 15), (-7, 34))
            ThreePointArc((-7, 34), (-4.5, 36.5), (-2, 34))
        make_face()
        with BuildLine():
            Line((7, 34), (7, 15))
            ThreePointArc((7, 15), (4.5, 12.5), (2, 15))
            Line((2, 15), (2, 34))
            ThreePointArc((2, 34), (4.5, 36.5), (7, 34))
        make_face()
        with BuildLine():
            Line((-2, 43), (-2, 62))
            ThreePointArc((-2, 62), (-4.5, 64.5), (-7, 62))
            Line((-7, 62), (-7, 43))
            ThreePointArc((-7, 43), (-4.5, 40.5), (-2, 43))
        make_face()
        with BuildLine():
            Line((7, 43), (7, 62))
            ThreePointArc((7, 62), (4.5, 64.5), (2, 62))
            Line((2, 62), (2, 43))
            ThreePointArc((2, 43), (4.5, 40.5), (7, 43))
        make_face()
    extrude(amount=-CUT_EXTRUDE_5_DEPTH, mode=Mode.SUBTRACT)

    # 草图15 → 切除-拉伸6 (cut)
    with BuildSketch(Plane.XZ.offset(-89)):
        with BuildLine():
            Line((-30, 12), (-15, 12))
            ThreePointArc((-15, 12), (-13.625, 10.625), (-15, 9.25))
            Line((-15, 9.25), (-30, 9.25))
            ThreePointArc((-30, 9.25), (-31.375, 10.625), (-30, 12))
        make_face()
        with BuildLine():
            Line((-37, 6.25), (-17, 6.25))
            ThreePointArc((-17, 6.25), (-15.625, 4.875), (-17, 3.5))
            Line((-17, 3.5), (-37, 3.5))
            ThreePointArc((-37, 3.5), (-38.375, 4.875), (-37, 6.25))
        make_face()
        with BuildLine():
            Line((-30, -12), (-15, -12))
            ThreePointArc((-15, -12), (-13.625, -10.625), (-15, -9.25))
            Line((-15, -9.25), (-30, -9.25))
            ThreePointArc((-30, -9.25), (-31.375, -10.625), (-30, -12))
        make_face()
        with BuildLine():
            Line((-37, -6.25), (-17, -6.25))
            ThreePointArc((-17, -6.25), (-15.625, -4.875), (-17, -3.5))
            Line((-17, -3.5), (-37, -3.5))
            ThreePointArc((-37, -3.5), (-38.375, -4.875), (-37, -6.25))
        make_face()
    extrude(amount=-CUT_EXTRUDE_6_DEPTH, mode=Mode.SUBTRACT)


solid = part.part
